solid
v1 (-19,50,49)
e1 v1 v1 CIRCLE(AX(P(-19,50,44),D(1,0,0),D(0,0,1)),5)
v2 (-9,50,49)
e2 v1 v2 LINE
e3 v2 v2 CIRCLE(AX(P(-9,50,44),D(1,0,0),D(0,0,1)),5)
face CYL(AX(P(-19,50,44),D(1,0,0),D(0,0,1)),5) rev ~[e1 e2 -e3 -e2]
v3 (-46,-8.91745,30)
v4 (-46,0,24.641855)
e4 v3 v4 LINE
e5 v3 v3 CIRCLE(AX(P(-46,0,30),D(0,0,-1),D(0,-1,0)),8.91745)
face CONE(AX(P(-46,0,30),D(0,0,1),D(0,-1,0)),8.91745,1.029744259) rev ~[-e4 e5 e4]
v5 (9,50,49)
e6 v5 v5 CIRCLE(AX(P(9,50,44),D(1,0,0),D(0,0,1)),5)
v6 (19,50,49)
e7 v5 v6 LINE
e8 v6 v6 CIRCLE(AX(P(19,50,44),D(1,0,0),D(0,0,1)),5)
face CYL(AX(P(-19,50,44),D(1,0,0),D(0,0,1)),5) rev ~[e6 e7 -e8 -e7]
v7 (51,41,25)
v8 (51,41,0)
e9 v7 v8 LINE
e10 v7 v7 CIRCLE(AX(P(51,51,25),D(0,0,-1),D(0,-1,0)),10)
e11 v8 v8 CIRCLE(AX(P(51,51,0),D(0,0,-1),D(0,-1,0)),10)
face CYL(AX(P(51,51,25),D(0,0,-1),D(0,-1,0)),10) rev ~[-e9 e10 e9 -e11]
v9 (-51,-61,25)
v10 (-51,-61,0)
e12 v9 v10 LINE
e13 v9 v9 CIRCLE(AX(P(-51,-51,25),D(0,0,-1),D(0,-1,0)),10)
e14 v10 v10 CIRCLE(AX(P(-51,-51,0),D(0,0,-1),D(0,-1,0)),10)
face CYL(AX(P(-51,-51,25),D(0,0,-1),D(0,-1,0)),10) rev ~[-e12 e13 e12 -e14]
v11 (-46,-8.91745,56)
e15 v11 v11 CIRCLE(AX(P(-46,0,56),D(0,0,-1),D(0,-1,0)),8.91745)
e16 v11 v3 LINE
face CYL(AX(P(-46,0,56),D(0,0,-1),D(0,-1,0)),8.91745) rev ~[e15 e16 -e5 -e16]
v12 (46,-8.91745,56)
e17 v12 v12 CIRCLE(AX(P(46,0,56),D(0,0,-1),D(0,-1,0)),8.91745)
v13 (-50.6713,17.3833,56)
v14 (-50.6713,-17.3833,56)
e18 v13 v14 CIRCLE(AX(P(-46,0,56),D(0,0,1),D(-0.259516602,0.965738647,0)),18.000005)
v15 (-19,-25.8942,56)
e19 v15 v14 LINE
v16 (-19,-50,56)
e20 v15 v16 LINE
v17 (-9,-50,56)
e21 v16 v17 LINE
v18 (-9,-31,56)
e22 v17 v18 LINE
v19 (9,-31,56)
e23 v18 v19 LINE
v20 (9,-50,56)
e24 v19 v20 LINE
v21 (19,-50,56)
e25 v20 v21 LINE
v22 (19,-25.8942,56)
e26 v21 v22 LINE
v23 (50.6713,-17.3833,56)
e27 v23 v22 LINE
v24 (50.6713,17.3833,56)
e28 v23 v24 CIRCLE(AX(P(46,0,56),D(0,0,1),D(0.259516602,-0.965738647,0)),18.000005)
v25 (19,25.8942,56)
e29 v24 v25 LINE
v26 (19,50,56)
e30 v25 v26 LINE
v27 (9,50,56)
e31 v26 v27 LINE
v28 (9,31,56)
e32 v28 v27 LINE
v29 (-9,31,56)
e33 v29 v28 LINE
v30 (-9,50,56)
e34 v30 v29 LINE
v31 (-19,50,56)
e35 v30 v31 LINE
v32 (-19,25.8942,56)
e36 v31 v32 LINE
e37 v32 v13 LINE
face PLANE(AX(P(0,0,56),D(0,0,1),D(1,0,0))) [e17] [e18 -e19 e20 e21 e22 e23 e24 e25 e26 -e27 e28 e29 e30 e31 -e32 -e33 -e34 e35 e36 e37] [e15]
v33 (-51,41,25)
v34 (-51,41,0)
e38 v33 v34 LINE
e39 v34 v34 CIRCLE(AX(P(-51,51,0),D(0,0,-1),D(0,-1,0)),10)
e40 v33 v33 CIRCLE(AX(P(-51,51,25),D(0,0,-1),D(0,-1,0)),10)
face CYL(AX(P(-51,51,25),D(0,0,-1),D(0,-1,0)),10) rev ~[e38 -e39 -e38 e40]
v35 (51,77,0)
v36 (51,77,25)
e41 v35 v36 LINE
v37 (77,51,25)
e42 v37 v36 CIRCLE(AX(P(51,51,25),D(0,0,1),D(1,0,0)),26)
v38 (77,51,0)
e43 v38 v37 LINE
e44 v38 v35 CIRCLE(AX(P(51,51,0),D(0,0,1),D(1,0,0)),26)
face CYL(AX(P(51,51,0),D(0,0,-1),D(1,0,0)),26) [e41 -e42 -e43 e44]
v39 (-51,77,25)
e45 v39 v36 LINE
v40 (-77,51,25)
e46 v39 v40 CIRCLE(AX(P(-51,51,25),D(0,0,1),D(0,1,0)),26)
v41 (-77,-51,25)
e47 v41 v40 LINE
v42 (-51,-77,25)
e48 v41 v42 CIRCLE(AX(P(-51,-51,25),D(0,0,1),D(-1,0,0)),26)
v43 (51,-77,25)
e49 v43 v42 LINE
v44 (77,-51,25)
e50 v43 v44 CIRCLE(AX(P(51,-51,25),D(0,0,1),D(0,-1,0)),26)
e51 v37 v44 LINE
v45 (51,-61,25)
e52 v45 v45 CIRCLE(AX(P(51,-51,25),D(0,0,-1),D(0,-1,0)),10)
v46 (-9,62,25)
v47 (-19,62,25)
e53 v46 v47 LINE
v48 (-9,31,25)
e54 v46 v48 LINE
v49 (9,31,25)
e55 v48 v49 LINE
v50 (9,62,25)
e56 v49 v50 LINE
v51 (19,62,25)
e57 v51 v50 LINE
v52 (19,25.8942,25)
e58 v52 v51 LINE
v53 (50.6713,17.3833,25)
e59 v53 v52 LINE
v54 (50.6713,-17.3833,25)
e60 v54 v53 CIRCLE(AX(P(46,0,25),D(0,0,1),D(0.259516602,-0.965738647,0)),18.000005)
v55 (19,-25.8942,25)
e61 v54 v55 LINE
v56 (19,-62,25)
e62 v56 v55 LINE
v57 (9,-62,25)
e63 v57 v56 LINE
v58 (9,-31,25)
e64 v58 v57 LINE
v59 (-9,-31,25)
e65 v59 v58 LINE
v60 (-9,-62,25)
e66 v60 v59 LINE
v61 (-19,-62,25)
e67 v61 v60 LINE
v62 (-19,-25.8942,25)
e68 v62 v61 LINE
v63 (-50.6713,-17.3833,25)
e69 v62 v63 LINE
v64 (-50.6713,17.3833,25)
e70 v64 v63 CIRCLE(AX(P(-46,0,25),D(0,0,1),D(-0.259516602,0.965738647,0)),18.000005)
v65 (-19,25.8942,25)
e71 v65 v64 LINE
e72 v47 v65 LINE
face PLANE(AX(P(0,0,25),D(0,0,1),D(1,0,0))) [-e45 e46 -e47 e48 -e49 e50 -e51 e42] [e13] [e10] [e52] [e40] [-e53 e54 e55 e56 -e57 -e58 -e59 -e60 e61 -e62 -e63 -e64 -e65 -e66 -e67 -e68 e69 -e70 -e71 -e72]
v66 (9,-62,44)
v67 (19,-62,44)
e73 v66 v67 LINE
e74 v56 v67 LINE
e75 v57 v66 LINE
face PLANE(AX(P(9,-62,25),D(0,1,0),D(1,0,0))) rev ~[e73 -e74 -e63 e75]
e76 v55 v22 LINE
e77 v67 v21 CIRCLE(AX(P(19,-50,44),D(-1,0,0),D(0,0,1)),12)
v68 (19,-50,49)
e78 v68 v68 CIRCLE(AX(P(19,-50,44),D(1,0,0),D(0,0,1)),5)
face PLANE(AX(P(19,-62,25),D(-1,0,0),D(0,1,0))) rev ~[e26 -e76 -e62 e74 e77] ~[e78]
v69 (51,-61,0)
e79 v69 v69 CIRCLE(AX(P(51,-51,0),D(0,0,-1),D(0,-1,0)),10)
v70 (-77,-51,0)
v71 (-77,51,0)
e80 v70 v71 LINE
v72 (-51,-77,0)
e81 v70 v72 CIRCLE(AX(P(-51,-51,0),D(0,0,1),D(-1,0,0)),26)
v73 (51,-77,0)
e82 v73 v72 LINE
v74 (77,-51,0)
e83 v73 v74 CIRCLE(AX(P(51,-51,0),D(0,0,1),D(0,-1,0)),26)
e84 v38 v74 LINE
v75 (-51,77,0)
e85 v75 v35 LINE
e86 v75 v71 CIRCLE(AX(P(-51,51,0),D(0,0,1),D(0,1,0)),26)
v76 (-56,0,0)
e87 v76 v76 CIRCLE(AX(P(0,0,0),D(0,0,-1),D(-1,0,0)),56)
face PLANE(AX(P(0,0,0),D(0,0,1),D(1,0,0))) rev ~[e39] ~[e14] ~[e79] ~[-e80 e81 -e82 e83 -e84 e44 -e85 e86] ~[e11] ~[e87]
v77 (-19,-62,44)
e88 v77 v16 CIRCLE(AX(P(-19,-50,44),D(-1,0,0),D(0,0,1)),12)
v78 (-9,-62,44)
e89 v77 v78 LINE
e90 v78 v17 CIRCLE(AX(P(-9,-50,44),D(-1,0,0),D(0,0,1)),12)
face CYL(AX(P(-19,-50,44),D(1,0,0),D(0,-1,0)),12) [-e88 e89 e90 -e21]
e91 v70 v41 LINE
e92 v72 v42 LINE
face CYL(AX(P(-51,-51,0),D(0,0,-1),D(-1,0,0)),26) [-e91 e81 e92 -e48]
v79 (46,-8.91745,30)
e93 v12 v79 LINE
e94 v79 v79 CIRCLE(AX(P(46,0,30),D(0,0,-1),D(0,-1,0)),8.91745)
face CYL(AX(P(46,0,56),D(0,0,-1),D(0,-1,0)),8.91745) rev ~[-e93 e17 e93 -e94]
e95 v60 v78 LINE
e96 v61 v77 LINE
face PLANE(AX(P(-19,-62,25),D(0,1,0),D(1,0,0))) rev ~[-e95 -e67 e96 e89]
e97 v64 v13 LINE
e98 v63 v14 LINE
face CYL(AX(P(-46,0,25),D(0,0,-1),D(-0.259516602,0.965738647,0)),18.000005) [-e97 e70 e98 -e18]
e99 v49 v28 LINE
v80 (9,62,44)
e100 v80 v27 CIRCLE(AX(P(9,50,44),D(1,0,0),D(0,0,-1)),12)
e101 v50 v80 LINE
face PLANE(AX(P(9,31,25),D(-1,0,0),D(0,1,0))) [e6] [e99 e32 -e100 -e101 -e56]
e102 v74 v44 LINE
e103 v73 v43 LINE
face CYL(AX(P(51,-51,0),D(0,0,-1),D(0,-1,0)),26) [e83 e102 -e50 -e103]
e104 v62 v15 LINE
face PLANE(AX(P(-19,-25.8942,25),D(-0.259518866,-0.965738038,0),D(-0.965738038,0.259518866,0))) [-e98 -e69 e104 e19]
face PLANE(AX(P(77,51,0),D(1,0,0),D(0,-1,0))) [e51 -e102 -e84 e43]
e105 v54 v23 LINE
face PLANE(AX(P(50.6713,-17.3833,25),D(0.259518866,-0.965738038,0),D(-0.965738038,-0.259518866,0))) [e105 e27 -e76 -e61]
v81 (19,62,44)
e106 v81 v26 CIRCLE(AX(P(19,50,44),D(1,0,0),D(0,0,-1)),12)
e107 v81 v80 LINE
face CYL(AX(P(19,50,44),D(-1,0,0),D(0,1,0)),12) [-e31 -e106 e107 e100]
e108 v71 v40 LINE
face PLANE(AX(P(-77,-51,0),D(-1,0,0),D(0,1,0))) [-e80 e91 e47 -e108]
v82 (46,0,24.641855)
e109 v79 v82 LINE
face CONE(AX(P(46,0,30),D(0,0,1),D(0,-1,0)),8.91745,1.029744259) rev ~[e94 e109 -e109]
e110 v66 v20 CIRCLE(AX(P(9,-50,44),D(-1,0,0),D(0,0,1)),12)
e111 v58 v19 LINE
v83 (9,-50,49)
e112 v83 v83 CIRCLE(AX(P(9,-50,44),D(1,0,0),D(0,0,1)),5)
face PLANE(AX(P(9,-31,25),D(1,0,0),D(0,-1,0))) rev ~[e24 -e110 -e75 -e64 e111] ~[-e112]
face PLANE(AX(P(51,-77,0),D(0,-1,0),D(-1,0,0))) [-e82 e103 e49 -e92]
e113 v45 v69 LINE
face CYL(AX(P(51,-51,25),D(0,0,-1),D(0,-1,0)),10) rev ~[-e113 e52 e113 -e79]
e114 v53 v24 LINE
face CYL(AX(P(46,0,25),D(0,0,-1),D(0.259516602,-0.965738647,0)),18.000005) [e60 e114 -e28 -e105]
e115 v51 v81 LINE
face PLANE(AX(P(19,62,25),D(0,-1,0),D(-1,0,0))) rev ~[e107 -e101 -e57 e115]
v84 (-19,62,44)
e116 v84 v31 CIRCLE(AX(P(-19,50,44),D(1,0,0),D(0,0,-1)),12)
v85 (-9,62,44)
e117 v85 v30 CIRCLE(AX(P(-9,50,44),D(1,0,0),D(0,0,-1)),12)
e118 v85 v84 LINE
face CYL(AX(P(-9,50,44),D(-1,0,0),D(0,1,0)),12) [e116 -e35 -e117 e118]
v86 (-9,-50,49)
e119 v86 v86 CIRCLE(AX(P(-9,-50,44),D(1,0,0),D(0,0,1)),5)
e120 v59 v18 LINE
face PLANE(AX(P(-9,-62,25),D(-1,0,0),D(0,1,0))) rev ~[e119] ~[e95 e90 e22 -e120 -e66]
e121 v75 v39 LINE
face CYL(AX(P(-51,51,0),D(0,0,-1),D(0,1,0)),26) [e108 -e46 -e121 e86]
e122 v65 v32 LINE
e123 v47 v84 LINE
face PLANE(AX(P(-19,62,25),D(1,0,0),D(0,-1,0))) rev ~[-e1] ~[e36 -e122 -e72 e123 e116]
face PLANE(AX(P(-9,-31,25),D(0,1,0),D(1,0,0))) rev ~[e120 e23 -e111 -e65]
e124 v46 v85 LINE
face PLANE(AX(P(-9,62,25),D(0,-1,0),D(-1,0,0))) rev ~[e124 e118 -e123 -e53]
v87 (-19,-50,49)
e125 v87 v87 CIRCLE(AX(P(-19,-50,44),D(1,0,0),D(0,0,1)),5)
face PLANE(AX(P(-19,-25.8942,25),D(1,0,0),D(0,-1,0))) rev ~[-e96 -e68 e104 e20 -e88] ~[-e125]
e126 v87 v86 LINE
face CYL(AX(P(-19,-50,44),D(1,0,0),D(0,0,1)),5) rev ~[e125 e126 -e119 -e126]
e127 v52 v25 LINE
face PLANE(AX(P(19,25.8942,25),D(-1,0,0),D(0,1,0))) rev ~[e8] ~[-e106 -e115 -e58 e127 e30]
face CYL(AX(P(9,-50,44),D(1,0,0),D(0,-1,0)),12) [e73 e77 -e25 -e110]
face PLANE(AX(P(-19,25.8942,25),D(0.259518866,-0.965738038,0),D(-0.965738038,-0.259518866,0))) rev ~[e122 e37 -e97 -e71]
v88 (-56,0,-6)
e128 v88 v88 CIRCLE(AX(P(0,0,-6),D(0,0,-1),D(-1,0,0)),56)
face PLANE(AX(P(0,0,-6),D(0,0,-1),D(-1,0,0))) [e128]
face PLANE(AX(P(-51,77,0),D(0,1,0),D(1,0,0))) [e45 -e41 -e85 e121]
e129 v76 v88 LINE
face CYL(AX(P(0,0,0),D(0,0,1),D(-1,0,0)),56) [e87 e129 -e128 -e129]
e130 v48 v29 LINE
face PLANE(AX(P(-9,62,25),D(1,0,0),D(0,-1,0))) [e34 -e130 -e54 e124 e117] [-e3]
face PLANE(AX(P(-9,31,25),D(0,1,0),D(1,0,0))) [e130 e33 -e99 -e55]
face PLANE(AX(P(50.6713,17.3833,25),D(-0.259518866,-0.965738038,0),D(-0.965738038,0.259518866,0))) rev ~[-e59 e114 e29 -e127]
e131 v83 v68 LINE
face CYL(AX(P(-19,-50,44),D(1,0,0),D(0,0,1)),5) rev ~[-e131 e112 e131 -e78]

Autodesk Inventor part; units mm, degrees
ref_plane "YZ Plane" through (0, 0, 0) normal (1, 0, 0) x (0, 1, 0)
ref_plane "XZ Plane" through (0, 0, 0) normal (0, 1, 0) x (-1, 0, 0)
ref_plane "XY Plane" through (0, 0, 0) normal (0, 0, 1) x (1, 0, 0)
sketch "Sketch1" plane through (0, 0, 0) normal (0, 0, 1) x (1, 0, 0)
  line L0 (-51, 77) -> (51, 77)
  line L1 (77, 51) -> (77, -51)
  line L2 (51, -77) -> (-51, -77)
  line L3 (-77, -51) -> (-77, 51)
  line L4 (-77, 77) -> (77, -77) construction
  line L5 (77, 77) -> (-77, -77) construction
  arc A0 (-51, 77) -> (-77, 51) centre (-51, 51) ccw
  arc A1 (-77, -51) -> (-51, -77) centre (-51, -51) ccw
  arc A2 (51, -77) -> (77, -51) centre (51, -51) ccw
  arc A3 (77, 51) -> (51, 77) centre (51, 51) ccw
  point P0 (0, 0)
  dimension "d0" = 154
  dimension "d1" = 154
  dimension "d2" = 26
extrude "Extrusion1" add sketch "Sketch1" along normal blind 25
sketch "Sketch2" plane through (0, 0, 25) normal (0, 0, 1) x (1, 0, 0)
  arc A0 (-77, -51) -> (-51, -77) centre (-51, -51) ccw projected
  arc A1 (51, -77) -> (77, -51) centre (51, -51) ccw projected
  arc A2 (77, 51) -> (51, 77) centre (51, 51) ccw projected
  arc A3 (-51, 77) -> (-77, 51) centre (-51, 51) ccw projected
  point P0 (0, 0)
hole "Hole1" at (-51, -51, 25) at (51, -51, 25) at (51, 51, 25) at (-51, 51, 25) direction (0, 0, -1) diameter 20 end through all
sketch "Sketch3" plane through (0, 0, 0) normal (0, 0, -1) x (-1, 0, 0)
  circle A0 centre (0, 0) radius 56
  dimension "d12" = 112
extrude "Extrusion2" add sketch "Sketch3" along normal blind 6
sketch "Sketch4" plane through (0, 0, 25) normal (0, 0, 1) x (1, 0, 0)
  line L0 (51, 77) -> (-51, 77) projected
sketch "Sketch5" plane through (0, 0, 25) normal (0, 0, 1) x (1, 0, 0)
  arc A0 (50.6713, -17.3833) -> (50.6713, 17.3833) centre (46, 0) ccw
  arc A1 (-50.6713, 17.3833) -> (-50.6713, -17.3833) centre (-46, 0) ccw
  line L0 (0, 31) -> (0, -31) construction
  line L1 (19, 62) -> (-19, -62) construction
  line L2 (-19, 62) -> (19, -62) construction
  line L3 (-9, 62) -> (-9, 31)
  line L4 (-9, 31) -> (9, 31)
  line L5 (9, 31) -> (9, 62)
  line L6 (-9, -62) -> (-9, -31)
  line L7 (-9, -31) -> (9, -31)
  line L8 (9, -31) -> (9, -62)
  line L9 (19, 62) -> (9, 62)
  line L10 (-9, 62) -> (-19, 62)
  line L11 (-19, -62) -> (-9, -62)
  line L12 (9, -62) -> (19, -62)
  line L13 (19, -62) -> (19, -25.8942)
  line L14 (19, 25.8942) -> (19, 62)
  line L15 (-19, 62) -> (-19, 25.8942)
  line L16 (-19, -25.8942) -> (-19, -62)
  line L17 (-19, 25.8942) -> (-50.6713, 17.3833)
  line L18 (-19, -25.8942) -> (-50.6713, -17.3833)
  line L19 (50.6713, -17.3833) -> (19, -25.8942)
  line L20 (50.6713, 17.3833) -> (19, 25.8942)
  point P0 (0, 0)
  dimension "d34" = 36
  dimension "d35" = 36
  dimension "d36" = 92
  dimension "d37" = 46
  dimension "d38" = 62
  dimension "d41" = 38
  dimension "d42" = 124
  dimension "d43" = 18
  dimension "d44" = 31
  dimension "d46" = 18
  dimension "d47" = 31
extrude "Extrusion3" add sketch "Sketch5" along normal blind 31
sketch "Sketch6" plane through (0, 0, 56) normal (0, 0, 1) x (1, 0, 0)
  arc A0 (-50.6713, 17.3833) -> (-50.6713, -17.3833) centre (-46, 0) ccw projected
  arc A1 (50.6713, -17.3833) -> (50.6713, 17.3833) centre (46, 0) ccw projected
  point P0 (0, 0)
hole "Hole2" at (-46, 0, 56) at (46, 0, 56) direction (0, 0, -1) diameter 17.8349 depth 26 tip angle 118 thread size "M20x2" class "6H" standard "ISO Metric profile"
fillet "Fillet1" radius 12 4 edges at (-14, -62, 56) (14, -62, 56) (14, 62, 56) (-14, 62, 56)
sketch "Sketch7" plane through (-19, -62, 25) normal (-1, 0, 0) x (0, 0, 1)
  arc A0 (19, 0) -> (31, 12) centre (19, 12) ccw projected
  arc A1 (31, 112) -> (19, 124) centre (19, 112) ccw projected
  point P0 (-25, 62)
hole "Hole3" at (-19, -50, 44) at (-19, 50, 44) direction (1, 0, 0) diameter 10 end through all
equation "\"d37\" = 0.5 * d36"
properties part number "cad@74"
